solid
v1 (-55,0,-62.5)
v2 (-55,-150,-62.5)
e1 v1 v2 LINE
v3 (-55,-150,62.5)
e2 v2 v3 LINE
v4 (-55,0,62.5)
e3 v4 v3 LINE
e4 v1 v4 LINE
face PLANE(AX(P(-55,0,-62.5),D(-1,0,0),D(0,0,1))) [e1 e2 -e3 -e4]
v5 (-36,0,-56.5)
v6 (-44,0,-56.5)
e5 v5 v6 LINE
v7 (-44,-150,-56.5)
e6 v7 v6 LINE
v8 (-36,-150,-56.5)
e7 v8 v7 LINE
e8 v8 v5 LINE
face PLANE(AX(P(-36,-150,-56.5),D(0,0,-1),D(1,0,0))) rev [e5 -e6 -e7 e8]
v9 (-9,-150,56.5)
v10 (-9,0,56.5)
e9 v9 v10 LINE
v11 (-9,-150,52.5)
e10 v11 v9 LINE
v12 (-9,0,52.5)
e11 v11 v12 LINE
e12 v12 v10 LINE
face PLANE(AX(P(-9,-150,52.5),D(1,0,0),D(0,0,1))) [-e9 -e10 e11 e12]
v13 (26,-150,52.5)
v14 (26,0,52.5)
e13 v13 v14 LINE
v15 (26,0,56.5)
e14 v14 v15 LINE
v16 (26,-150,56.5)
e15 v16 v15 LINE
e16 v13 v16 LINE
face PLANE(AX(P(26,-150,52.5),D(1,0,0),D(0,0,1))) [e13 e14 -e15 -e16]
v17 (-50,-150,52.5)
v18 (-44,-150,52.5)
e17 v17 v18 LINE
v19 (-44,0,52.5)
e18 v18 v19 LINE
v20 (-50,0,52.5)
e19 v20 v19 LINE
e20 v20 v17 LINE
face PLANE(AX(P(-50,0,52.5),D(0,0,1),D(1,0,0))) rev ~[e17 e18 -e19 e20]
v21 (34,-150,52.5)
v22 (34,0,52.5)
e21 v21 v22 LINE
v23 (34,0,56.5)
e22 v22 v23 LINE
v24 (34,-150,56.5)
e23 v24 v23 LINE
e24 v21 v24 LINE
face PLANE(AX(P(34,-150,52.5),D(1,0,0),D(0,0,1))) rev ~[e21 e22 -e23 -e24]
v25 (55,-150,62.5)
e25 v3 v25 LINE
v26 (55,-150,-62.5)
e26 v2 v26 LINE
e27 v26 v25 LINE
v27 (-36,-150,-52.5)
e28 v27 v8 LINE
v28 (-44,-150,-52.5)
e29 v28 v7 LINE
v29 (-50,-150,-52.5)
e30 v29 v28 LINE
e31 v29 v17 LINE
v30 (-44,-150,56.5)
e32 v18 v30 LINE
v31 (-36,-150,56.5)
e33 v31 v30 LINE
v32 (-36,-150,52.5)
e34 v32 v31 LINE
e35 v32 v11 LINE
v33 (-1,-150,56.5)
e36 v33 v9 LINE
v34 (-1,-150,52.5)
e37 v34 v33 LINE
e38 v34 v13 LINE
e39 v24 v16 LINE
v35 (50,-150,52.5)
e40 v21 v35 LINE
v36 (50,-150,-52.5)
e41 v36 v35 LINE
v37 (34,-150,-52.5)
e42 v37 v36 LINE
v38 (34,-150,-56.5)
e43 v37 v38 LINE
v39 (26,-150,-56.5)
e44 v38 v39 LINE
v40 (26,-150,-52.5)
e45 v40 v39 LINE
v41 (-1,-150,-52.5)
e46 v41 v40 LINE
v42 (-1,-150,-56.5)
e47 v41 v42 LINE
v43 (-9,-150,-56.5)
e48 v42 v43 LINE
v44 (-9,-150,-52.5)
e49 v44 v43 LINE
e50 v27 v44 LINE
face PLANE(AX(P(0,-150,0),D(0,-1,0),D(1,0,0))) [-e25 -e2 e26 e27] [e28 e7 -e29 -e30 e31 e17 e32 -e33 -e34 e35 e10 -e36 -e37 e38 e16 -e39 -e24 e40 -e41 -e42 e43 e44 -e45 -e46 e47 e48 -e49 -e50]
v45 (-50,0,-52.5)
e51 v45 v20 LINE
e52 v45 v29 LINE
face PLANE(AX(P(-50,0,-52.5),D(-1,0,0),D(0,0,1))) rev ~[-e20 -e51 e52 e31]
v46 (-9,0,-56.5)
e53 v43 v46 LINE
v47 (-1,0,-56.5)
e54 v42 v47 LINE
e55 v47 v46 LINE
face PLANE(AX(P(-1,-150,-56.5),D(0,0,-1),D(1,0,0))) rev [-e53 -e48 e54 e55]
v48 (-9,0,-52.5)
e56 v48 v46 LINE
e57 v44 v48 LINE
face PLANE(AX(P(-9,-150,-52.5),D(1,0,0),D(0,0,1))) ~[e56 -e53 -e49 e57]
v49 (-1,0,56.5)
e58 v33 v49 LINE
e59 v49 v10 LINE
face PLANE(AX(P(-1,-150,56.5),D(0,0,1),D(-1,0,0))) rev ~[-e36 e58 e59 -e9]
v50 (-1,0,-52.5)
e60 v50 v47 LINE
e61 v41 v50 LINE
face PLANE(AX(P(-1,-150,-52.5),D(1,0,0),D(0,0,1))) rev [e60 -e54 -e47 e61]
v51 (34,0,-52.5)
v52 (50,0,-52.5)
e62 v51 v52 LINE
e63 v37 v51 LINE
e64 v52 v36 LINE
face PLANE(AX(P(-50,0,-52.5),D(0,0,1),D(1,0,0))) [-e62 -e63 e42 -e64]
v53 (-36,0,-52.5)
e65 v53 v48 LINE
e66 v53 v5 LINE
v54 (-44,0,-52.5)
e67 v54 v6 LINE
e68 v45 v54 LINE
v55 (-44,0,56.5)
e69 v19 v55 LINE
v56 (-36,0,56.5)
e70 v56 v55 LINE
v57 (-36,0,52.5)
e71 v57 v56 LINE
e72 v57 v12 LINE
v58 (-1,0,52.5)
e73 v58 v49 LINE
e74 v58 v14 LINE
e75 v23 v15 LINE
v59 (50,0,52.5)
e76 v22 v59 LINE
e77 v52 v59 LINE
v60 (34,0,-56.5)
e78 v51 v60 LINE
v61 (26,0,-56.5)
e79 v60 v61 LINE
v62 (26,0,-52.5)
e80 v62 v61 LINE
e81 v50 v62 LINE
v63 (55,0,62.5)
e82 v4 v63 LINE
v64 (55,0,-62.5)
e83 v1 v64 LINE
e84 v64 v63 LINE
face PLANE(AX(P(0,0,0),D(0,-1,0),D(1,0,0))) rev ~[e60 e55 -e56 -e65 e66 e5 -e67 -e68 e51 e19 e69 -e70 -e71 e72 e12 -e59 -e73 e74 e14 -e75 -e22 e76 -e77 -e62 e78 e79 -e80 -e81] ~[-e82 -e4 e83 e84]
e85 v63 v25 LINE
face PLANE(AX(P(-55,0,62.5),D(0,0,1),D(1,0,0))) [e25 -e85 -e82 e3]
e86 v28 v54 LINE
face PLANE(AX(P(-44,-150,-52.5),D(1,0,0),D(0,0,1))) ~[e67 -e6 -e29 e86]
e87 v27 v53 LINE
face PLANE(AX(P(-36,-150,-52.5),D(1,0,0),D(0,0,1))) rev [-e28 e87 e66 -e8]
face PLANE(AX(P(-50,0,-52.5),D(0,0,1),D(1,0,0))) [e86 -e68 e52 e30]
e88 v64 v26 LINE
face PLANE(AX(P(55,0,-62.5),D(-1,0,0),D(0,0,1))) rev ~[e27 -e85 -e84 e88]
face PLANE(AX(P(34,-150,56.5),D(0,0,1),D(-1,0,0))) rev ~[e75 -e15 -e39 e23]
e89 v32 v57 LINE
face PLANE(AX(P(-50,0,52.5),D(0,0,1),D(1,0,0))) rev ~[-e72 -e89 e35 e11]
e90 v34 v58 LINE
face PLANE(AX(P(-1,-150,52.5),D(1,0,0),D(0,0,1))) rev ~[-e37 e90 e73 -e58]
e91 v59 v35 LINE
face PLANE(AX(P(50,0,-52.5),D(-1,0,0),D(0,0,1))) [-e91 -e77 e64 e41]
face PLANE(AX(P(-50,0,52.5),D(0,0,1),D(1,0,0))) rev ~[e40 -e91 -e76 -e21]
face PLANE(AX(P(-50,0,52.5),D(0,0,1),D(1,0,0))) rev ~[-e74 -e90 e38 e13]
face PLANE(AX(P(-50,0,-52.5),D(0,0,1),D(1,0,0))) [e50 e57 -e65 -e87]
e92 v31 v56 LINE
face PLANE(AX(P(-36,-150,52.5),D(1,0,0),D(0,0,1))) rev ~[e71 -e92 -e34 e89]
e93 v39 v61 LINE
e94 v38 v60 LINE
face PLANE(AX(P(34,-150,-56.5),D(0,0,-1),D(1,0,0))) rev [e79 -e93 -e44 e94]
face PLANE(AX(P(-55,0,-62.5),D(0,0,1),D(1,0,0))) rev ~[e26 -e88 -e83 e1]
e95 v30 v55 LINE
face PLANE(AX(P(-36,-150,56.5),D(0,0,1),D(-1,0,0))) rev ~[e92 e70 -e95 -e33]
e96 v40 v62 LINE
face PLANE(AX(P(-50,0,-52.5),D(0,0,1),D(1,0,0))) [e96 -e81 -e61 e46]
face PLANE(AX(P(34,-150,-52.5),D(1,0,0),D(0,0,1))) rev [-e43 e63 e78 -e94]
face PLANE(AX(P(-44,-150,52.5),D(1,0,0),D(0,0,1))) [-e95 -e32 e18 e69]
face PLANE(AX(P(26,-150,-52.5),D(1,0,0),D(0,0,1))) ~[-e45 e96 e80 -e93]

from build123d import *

# Parameters (mm, degrees)
F0_W     = 110
F0_H     = 125
F0_W_2   = 100
F0_H_2   = 105
F1_DEPTH = 150
F2_W     = 4
F2_H     = 4
F3_DEPTH = 150


# Not quite as in the source:
# - a pattern or mirror of a feature is missing from the dataset's text; its kind, count and spacing are read off the source's solid


with BuildPart() as f1:
    # F0 (on Front) → F1 (new body)
    with BuildSketch(Plane.XZ):
        Rectangle(F0_W, F0_H)
        Rectangle(F0_W_2, F0_H_2, mode=Mode.SUBTRACT)
    extrude(amount=F1_DEPTH)

    # F2 (on face) → F3 (cut, through all)
    with BuildSketch(Plane.XZ.offset(150)):
        with Locations((-42, 54.5)):
            Rectangle(F2_W, F2_H)
        with Locations((-38, 54.5)):
            Rectangle(F2_W, F2_H)
        with Locations((-3, 54.5)):
            Rectangle(F2_W, F2_H)
        with Locations((-7, 54.5)):
            Rectangle(F2_W, F2_H)
        with Locations((32, 54.5)):
            Rectangle(F2_W, F2_H)
        with Locations((28, 54.5)):
            Rectangle(F2_W, F2_H)
    f3 = extrude(amount=-F3_DEPTH, mode=Mode.SUBTRACT)

    # F3_copies: F3 across plane
    add(f3.mirror(Plane(origin=(0, 0, 0), x_dir=(-1, 0, 0), z_dir=(0, 0, -1))), mode=Mode.SUBTRACT)


solid = f1.part
